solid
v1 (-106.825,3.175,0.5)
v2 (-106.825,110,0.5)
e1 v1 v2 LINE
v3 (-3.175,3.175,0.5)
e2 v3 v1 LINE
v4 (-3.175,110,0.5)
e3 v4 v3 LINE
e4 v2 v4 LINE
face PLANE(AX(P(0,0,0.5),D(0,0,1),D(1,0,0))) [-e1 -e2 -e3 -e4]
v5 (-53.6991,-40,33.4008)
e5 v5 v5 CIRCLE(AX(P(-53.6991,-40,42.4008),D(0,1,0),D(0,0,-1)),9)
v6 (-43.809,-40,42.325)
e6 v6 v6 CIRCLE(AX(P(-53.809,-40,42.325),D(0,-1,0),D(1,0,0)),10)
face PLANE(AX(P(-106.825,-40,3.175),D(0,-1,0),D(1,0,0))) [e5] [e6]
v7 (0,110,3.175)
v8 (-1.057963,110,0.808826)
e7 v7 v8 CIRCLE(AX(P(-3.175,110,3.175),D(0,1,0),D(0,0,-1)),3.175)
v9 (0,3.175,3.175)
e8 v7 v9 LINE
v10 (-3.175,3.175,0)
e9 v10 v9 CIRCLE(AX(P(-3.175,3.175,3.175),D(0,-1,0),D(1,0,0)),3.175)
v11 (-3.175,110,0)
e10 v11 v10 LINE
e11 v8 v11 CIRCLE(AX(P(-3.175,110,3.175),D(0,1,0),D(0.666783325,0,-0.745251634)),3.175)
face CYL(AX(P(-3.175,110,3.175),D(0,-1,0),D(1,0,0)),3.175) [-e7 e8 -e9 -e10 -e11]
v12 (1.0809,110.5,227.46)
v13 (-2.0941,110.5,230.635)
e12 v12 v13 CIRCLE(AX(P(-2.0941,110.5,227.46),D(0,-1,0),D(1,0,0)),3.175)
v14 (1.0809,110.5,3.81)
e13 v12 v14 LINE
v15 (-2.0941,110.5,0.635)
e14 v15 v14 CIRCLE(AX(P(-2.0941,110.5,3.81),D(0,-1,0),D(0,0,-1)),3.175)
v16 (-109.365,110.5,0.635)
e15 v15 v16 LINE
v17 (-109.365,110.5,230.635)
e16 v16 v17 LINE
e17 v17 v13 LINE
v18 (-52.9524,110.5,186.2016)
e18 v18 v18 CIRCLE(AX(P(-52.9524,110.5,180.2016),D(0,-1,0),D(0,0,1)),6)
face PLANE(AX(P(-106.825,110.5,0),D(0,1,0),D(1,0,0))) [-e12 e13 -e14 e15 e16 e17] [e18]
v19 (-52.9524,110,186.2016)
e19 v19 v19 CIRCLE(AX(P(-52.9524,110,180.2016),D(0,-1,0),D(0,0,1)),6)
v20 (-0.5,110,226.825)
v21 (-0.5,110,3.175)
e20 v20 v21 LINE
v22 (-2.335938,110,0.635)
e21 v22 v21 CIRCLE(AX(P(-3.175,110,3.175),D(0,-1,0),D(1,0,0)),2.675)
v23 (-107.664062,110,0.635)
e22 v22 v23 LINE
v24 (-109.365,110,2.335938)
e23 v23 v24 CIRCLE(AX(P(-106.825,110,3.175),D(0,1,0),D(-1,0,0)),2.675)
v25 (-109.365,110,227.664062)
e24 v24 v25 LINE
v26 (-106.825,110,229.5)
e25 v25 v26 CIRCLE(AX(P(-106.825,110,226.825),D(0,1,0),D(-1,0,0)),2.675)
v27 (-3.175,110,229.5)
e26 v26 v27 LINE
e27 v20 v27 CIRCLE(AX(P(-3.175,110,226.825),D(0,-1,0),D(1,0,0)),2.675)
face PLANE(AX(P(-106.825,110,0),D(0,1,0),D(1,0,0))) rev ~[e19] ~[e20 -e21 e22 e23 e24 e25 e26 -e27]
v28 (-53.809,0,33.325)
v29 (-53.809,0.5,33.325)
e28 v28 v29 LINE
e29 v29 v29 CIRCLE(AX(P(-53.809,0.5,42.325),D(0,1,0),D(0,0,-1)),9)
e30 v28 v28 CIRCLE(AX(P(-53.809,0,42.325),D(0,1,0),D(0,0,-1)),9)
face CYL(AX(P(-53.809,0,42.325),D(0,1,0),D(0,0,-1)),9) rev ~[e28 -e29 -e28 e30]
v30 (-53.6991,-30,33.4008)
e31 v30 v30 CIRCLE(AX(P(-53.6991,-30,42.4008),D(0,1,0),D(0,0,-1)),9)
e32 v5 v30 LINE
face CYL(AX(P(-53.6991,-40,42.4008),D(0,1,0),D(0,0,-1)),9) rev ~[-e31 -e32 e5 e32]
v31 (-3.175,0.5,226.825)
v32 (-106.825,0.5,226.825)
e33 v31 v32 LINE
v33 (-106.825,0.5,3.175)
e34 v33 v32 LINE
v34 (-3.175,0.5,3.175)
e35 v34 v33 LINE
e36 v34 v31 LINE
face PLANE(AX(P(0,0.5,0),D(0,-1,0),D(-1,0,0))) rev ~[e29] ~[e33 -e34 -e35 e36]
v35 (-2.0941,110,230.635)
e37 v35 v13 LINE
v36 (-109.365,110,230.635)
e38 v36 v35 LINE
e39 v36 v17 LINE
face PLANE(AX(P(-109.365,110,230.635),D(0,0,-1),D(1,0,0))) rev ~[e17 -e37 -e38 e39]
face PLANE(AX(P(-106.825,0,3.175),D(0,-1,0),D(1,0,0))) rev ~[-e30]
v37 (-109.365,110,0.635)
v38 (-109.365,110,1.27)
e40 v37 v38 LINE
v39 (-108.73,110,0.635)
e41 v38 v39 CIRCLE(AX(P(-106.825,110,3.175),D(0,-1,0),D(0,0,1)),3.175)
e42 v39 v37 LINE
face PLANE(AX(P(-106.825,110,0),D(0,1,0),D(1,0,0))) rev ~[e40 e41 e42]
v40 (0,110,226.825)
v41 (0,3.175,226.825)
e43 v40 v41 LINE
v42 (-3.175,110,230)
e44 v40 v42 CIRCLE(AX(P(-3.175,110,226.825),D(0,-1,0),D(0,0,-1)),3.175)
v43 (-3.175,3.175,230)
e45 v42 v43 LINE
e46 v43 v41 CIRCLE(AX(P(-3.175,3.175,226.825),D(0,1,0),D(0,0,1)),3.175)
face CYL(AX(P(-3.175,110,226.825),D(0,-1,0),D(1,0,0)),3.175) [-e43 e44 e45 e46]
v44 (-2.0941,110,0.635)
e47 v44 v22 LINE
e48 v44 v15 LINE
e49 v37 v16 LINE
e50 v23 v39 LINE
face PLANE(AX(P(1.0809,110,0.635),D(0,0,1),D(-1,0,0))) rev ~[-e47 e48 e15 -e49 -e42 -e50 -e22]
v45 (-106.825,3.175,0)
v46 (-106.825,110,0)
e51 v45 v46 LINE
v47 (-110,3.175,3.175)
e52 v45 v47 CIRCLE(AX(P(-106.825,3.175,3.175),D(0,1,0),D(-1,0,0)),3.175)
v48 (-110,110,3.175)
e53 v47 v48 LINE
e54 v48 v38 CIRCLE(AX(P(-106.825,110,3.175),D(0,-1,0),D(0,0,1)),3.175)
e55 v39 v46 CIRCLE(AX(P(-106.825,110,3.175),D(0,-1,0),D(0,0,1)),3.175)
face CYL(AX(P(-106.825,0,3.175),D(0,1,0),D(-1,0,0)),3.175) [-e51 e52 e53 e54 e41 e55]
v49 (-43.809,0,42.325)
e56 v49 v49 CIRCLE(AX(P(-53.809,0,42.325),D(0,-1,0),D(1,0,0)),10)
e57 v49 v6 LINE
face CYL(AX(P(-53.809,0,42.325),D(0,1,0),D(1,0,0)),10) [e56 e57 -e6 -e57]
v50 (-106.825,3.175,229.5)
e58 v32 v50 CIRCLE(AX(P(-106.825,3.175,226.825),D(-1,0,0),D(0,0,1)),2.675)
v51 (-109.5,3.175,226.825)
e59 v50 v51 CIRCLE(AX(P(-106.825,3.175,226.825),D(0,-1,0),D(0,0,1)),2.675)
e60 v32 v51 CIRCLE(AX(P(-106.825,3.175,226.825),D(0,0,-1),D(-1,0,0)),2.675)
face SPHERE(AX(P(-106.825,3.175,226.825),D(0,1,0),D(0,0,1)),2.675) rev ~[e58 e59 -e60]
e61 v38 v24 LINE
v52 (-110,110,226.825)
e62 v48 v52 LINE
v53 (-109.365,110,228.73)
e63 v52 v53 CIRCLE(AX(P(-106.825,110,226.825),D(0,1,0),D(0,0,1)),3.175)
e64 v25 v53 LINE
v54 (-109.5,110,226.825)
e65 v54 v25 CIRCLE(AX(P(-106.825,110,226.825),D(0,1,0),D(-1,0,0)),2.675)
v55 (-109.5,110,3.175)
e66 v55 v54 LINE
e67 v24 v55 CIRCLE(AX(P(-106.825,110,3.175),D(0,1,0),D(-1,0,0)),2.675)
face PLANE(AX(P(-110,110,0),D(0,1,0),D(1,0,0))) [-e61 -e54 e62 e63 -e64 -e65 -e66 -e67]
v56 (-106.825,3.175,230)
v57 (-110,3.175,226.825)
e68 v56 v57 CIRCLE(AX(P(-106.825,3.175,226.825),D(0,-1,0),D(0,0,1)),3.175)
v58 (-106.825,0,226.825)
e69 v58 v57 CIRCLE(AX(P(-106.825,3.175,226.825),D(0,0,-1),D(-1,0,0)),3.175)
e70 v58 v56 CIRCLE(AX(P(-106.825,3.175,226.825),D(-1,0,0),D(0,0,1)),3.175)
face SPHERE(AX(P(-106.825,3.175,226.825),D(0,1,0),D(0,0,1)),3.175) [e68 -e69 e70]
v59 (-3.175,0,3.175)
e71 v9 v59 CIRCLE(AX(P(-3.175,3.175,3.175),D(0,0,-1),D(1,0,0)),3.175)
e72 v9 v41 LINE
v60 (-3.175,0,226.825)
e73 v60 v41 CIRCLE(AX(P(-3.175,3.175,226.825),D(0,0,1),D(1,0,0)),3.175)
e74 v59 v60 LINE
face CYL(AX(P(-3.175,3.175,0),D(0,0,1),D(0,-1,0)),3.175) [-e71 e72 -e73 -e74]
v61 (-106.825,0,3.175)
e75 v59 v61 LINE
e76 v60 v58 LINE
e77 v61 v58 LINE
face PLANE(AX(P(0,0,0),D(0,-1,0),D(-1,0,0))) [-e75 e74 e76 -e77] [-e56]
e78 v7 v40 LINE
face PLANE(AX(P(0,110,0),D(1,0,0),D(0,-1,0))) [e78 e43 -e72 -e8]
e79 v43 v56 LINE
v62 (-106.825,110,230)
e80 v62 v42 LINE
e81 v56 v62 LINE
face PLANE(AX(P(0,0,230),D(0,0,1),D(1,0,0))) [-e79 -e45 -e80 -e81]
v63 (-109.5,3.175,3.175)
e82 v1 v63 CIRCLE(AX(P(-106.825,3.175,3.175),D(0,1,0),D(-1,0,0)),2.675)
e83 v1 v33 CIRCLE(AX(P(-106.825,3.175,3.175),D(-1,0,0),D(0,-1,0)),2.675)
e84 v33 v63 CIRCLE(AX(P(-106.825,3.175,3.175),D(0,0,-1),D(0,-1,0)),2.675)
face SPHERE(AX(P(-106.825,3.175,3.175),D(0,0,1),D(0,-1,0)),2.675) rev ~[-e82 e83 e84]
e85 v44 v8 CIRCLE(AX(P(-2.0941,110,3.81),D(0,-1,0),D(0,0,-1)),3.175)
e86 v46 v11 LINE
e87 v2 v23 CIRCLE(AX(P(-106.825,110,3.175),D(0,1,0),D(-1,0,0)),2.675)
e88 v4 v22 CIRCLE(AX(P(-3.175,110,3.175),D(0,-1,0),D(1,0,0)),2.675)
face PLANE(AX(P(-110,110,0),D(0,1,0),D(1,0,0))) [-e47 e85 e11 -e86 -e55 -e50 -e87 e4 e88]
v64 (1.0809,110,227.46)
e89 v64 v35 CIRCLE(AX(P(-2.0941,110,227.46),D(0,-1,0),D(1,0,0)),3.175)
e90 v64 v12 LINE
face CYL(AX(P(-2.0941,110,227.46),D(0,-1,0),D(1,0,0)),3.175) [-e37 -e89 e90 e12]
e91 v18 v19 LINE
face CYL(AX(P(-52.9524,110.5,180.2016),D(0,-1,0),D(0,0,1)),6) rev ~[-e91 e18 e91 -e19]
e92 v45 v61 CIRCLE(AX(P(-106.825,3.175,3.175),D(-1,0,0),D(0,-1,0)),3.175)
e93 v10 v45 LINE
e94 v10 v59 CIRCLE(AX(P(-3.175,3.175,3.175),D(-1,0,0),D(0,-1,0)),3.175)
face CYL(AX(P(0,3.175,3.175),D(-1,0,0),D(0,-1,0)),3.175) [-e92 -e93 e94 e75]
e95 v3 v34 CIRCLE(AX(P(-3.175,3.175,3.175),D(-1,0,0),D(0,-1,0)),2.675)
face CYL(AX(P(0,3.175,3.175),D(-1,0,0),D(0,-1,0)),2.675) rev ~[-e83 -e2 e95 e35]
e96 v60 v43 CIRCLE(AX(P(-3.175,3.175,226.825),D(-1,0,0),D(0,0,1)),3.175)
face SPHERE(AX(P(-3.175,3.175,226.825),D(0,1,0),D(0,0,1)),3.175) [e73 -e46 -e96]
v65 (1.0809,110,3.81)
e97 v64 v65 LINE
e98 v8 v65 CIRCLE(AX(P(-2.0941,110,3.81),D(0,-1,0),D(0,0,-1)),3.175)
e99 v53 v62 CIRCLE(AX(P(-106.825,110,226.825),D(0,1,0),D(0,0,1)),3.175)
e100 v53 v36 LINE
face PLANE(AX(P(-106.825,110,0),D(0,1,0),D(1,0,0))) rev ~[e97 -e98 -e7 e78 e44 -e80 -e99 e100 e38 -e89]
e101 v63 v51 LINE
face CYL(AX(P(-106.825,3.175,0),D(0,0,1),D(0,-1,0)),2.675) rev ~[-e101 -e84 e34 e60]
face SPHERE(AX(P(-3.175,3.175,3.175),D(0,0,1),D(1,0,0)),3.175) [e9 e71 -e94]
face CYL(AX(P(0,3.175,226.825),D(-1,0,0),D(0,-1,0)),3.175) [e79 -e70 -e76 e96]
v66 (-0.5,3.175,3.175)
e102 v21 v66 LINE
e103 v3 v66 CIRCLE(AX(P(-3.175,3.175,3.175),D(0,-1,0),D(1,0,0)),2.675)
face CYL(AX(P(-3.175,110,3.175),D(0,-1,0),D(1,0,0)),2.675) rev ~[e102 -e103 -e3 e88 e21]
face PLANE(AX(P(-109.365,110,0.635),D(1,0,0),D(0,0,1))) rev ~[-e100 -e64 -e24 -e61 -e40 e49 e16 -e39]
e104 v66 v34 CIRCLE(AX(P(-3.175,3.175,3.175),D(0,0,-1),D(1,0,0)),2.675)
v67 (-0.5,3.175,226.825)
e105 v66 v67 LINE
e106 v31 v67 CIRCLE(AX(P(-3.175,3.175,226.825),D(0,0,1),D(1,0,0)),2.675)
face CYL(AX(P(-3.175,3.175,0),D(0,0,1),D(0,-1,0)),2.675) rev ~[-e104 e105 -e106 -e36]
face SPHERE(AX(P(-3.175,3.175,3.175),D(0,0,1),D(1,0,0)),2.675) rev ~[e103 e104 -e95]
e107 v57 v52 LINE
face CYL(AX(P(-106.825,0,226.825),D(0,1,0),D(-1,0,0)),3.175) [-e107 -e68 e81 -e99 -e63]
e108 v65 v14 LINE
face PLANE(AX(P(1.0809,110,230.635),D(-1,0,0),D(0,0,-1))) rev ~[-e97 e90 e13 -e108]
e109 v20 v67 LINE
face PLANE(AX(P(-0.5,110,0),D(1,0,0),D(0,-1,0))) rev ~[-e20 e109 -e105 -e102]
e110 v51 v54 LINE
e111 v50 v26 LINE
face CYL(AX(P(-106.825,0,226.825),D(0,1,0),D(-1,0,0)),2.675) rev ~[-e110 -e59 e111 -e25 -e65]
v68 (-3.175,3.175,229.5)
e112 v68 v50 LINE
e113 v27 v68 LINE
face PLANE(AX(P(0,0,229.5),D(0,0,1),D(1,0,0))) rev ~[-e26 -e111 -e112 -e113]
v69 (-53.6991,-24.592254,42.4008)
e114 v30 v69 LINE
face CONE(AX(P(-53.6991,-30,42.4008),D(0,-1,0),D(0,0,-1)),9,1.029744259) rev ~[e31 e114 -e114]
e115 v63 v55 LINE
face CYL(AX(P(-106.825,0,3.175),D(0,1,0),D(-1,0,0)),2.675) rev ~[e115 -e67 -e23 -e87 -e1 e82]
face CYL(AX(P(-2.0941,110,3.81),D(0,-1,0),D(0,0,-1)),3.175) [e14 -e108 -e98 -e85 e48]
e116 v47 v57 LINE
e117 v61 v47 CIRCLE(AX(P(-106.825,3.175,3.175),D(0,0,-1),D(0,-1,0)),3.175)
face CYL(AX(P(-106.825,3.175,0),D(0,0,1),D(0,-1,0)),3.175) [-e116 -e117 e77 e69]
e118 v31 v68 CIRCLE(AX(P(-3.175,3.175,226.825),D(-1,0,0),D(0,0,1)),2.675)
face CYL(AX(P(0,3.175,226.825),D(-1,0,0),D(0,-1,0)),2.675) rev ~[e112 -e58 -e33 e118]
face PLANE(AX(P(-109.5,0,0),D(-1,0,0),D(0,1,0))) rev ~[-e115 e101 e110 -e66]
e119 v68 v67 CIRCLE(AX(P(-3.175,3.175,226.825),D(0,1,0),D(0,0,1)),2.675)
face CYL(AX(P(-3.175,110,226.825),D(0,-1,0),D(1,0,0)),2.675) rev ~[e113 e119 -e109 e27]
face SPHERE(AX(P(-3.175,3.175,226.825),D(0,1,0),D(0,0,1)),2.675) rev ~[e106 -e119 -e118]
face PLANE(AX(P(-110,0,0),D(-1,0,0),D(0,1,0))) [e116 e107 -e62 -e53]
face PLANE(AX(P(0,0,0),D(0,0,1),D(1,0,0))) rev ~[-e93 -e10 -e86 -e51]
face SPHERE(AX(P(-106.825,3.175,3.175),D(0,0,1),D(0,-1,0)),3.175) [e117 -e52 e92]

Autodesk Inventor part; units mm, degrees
ref_plane "YZ Plane" through (0, 0, 0) normal (1, 0, 0) x (0, 1, 0)
ref_plane "XZ Plane" through (0, 0, 0) normal (0, 1, 0) x (-1, 0, 0)
ref_plane "XY Plane" through (0, 0, 0) normal (0, 0, 1) x (1, 0, 0)
sketch "Sketch1" plane through (0, 0, 0) normal (0, 0, 1) x (1, 0, 0)
  line L0 (0, 0) -> (-110, 0)
  line L1 (-110, 0) -> (-110, 110)
  line L2 (-110, 110) -> (0, 110)
  line L3 (0, 110) -> (0, 0)
  dimension "d0" = 110
  dimension "d1" = 110
extrude "Extrusion1" add sketch "Sketch1" along normal blind 230
fillet "Fillet2" radius 3.175 8 edges at (-110, 55, 230) (0, 55, 230) (-55, 0, 230) (-110, 0, 115) (0, 0, 115) (0, 55, 0) (-55, 0, 0) (-110, 55, 0)
shell "Shell1" thickness 0.5 removed faces 1 at (-36.6667, 110, 77.725)
sketch "Sketch2" plane through (-106.825, 110, 0) normal (0, 1, 0) x (1, 0, 0)
  line L0 (-2.54, -230.635) -> (107.9059, -230.635)
  line L1 (107.9059, -230.635) -> (107.9059, -0.635)
  line L2 (107.9059, -0.635) -> (-2.54, -0.635)
  line L3 (-2.54, -0.635) -> (-2.54, -230.635)
  point P0 (106.825, 0)
  point P1 (0, -229.5)
  point P2 (103.65, -3.175)
  dimension "d11" = 230
extrude "Extrusion2" add sketch "Sketch2" along normal blind 0.5
fillet "Fillet4" radius 3.175 2 edges at (1.0809, 110.25, 230.635) (1.0809, 110.25, 0.635)
sketch "Sketch3" plane through (-106.825, 110.5, 0) normal (0, 1, 0) x (1, 0, 0)
  point P0 (106.825, 0)
  point P1 (53.8726, -180.2016)
hole "Hole1" at (-52.9524, 110.5, 180.2016) direction (0, -1, 0) diameter 12 depth 10 tip angle 118
sketch "Sketch4" plane through (-106.825, 0, 3.175) normal (0, -1, 0) x (1, 0, 0)
  point P0 (106.825, -3.175)
  point P1 (53.016, 39.15)
hole "Hole2" at (-53.809, 0, 42.325) direction (0, 1, 0) diameter 18 depth 10 tip angle 118
sketch "Sketch5" plane through (-106.825, 0, 3.175) normal (0, -1, 0) x (1, 0, 0)
  circle A0 centre (53.016, 39.15) radius 9 projected
  circle A1 centre (53.016, 39.15) radius 10
  point P0 (106.825, -3.175)
  dimension "d27" = 20
extrude "Extrusion3" add sketch "Sketch5" along normal blind 40 contours A0 | A1
sketch "Sketch6" plane through (-53.809, -40, 42.325) normal (0, -1, 0) x (1, 0, 0)
  point P0 (53.809, -42.325)
  point P1 (0.11, 0.0758)
hole "Hole3" at (-53.6991, -40, 42.4008) direction (0, 1, 0) diameter 18 depth 10 tip angle 118
properties part number "oil_water_separator"
